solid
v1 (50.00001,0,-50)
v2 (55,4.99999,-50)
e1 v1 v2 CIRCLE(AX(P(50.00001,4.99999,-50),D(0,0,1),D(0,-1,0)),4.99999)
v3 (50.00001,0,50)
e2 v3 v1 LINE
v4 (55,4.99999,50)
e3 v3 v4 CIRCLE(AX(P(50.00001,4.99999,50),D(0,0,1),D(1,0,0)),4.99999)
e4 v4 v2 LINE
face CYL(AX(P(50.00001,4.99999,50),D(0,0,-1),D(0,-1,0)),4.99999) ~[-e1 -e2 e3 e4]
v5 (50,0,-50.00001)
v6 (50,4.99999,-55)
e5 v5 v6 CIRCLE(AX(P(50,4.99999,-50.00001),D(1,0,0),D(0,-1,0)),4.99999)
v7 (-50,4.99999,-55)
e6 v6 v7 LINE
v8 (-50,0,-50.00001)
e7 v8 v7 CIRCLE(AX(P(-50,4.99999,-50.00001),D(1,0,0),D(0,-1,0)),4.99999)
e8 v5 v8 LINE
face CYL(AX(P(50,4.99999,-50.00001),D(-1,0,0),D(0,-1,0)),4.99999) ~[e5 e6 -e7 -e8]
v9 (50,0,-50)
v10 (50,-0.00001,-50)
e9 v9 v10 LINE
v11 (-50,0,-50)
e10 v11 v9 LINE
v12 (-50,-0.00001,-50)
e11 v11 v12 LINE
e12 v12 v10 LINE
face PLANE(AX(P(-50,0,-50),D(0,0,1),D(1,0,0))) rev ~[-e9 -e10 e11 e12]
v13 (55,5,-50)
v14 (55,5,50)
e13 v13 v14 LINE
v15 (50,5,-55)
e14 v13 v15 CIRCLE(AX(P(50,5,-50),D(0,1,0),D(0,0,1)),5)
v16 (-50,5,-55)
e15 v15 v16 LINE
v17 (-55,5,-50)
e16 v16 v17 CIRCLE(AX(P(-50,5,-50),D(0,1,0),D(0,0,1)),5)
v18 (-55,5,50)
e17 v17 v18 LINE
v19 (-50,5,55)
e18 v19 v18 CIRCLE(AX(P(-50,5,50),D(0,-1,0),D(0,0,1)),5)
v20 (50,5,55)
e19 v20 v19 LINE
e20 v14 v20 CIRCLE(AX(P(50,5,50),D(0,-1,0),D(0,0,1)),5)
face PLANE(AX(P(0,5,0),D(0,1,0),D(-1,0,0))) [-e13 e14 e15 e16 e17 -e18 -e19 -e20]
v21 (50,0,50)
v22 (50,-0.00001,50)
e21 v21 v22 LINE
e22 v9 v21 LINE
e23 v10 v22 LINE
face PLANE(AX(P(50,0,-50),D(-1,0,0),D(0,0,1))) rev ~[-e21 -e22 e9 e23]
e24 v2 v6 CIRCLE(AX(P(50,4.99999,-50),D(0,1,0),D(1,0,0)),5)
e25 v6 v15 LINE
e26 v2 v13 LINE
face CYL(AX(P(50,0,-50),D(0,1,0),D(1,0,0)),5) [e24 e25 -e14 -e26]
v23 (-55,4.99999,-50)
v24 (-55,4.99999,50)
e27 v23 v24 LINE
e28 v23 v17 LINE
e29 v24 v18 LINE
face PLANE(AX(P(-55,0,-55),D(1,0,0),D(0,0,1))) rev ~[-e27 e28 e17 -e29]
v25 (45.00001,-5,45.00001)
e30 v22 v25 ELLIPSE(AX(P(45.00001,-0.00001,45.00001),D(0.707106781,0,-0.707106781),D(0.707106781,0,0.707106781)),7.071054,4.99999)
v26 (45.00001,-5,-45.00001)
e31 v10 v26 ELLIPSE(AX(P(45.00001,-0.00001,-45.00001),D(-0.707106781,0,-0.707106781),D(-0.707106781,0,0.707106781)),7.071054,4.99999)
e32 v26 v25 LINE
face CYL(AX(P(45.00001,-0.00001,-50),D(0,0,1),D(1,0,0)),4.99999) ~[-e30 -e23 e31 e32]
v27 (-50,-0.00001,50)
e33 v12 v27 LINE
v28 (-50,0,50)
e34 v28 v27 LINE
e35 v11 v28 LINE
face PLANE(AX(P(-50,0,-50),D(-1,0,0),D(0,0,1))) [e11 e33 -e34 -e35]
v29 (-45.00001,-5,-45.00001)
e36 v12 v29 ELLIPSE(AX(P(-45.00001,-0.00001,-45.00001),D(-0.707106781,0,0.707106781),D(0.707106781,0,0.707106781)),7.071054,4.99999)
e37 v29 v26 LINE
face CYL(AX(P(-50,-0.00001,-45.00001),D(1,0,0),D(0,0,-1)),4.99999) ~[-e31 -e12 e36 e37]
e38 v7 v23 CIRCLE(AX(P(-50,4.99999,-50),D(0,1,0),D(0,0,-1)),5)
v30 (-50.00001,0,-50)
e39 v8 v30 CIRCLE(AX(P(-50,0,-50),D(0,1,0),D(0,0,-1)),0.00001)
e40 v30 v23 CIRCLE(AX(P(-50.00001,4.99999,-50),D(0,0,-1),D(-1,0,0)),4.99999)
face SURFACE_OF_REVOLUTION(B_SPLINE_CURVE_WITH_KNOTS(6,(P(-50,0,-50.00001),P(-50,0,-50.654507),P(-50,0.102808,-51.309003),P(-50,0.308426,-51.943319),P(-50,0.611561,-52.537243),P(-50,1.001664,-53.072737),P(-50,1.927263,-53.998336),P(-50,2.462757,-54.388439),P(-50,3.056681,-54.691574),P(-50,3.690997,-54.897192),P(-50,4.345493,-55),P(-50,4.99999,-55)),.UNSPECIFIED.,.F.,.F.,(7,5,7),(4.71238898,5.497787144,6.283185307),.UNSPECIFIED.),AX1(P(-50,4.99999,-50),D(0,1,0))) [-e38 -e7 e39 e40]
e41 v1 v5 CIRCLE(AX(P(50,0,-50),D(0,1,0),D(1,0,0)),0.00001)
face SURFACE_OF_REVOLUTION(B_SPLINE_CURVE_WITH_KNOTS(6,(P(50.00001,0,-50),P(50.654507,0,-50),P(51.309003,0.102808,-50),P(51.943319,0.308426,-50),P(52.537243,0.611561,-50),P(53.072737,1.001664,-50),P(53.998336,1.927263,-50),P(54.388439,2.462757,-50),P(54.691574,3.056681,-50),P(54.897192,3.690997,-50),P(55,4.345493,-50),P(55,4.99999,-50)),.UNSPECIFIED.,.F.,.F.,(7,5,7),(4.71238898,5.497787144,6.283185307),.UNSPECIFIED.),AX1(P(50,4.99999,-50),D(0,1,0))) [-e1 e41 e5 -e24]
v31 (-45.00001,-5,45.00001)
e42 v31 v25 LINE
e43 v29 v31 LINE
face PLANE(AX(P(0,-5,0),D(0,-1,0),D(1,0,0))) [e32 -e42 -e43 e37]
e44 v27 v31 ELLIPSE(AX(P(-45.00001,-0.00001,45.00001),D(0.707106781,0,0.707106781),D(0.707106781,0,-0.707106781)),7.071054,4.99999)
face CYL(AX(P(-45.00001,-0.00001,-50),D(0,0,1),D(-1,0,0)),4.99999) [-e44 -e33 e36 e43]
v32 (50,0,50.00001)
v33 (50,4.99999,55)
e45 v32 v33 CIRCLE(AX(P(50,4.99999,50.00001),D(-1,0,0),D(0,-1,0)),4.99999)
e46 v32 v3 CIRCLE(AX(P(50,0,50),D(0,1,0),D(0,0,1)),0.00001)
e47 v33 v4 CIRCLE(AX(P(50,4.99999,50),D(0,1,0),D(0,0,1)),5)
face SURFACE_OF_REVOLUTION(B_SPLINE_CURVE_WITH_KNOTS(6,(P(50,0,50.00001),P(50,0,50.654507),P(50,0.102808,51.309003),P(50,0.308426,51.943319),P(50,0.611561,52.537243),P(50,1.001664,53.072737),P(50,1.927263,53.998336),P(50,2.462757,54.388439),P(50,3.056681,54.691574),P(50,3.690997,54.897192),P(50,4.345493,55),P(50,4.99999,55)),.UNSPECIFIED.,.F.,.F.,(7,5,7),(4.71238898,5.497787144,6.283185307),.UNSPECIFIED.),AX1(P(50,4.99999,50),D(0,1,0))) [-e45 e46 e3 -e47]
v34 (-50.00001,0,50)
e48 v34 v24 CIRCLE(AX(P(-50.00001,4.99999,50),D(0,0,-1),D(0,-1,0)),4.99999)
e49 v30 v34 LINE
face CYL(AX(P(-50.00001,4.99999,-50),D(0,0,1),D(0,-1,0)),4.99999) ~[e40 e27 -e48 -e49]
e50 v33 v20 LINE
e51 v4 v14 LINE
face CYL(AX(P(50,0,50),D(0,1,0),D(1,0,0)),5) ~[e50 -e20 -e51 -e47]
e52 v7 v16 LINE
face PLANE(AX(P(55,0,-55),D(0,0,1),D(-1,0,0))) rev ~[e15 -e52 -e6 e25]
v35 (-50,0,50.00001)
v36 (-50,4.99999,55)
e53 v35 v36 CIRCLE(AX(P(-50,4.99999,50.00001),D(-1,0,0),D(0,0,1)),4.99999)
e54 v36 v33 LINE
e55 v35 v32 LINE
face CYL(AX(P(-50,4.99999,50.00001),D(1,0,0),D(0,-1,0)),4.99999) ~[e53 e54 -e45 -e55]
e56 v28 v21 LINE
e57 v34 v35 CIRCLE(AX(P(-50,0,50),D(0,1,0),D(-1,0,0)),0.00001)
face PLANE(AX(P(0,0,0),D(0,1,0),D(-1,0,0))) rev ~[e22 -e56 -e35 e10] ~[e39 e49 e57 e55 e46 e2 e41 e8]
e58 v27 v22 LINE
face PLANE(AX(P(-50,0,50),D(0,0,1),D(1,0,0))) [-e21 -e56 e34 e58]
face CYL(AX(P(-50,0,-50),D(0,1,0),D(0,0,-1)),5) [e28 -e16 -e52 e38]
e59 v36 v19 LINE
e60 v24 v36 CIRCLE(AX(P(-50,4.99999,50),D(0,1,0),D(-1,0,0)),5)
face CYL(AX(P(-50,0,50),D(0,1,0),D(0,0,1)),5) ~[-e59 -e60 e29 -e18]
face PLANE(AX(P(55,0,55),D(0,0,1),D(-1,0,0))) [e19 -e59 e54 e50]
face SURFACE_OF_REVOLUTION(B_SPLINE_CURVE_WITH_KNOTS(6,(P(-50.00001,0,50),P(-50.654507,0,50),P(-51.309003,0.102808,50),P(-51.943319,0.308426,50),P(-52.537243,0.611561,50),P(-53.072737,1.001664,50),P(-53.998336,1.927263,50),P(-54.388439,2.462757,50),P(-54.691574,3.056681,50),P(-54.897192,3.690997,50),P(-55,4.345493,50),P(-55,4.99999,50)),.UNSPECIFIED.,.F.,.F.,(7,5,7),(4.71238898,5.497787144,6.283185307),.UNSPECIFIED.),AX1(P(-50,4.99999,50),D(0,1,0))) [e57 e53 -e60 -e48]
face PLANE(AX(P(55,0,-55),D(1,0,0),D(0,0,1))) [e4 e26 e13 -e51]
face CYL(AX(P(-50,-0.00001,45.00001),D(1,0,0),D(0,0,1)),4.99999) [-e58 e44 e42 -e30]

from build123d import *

# Parameters (mm, degrees)
F0_W     = 100
F0_H     = 100
F1_DEPTH = 5
F2_W     = 110
F2_H     = 110
F3_DEPTH = 5
F4_R     = 5
F5_R     = 4.99999
F6_R     = 4.99999


# Not quite as in the source:
# - a fillet or chamfer is up to 0.001 mm smaller than in the source, because OpenCascade refuses the exact size


with BuildPart() as f1:
    # F0 (on Front) → F1 (new body)
    with BuildSketch(Plane.XZ):
        Rectangle(F0_W, F0_H)
    extrude(amount=F1_DEPTH)

    # F2 (on face) → F3 (join)
    with BuildSketch(Plane(origin=(0, 0, 0), x_dir=(-1, 0, 0), z_dir=(0, 1, 0))):
        Rectangle(F2_W, F2_H)
    extrude(amount=F3_DEPTH)

    # F4
    f4_edges = [f1.edges().sort_by_distance(p)[0] for p in [
        (-55, 2.5, -55),
        (55, 2.5, -55),
        (55, 2.5, 55),
        (-55, 2.5, 55),
    ]]
    fillet(f4_edges, radius=F4_R)

    # F5 (radius 5 in the source; OpenCascade refuses exactly that, so slightly less here)
    f5_edges = [f1.edges().sort_by_distance(p)[0] for p in [
        (0, -5, 50),
        (50, -5, 0),
        (0, -5, -50),
        (-50, -5, 0),
    ]]
    fillet(f5_edges, radius=F5_R)

    # F6 (radius 5 in the source; OpenCascade refuses exactly that, so slightly less here)
    f6_edges = [f1.edges().sort_by_distance(p)[0] for p in [
        (0, 0, -55),
    ]]
    fillet(f6_edges, radius=F6_R)


solid = f1.part
